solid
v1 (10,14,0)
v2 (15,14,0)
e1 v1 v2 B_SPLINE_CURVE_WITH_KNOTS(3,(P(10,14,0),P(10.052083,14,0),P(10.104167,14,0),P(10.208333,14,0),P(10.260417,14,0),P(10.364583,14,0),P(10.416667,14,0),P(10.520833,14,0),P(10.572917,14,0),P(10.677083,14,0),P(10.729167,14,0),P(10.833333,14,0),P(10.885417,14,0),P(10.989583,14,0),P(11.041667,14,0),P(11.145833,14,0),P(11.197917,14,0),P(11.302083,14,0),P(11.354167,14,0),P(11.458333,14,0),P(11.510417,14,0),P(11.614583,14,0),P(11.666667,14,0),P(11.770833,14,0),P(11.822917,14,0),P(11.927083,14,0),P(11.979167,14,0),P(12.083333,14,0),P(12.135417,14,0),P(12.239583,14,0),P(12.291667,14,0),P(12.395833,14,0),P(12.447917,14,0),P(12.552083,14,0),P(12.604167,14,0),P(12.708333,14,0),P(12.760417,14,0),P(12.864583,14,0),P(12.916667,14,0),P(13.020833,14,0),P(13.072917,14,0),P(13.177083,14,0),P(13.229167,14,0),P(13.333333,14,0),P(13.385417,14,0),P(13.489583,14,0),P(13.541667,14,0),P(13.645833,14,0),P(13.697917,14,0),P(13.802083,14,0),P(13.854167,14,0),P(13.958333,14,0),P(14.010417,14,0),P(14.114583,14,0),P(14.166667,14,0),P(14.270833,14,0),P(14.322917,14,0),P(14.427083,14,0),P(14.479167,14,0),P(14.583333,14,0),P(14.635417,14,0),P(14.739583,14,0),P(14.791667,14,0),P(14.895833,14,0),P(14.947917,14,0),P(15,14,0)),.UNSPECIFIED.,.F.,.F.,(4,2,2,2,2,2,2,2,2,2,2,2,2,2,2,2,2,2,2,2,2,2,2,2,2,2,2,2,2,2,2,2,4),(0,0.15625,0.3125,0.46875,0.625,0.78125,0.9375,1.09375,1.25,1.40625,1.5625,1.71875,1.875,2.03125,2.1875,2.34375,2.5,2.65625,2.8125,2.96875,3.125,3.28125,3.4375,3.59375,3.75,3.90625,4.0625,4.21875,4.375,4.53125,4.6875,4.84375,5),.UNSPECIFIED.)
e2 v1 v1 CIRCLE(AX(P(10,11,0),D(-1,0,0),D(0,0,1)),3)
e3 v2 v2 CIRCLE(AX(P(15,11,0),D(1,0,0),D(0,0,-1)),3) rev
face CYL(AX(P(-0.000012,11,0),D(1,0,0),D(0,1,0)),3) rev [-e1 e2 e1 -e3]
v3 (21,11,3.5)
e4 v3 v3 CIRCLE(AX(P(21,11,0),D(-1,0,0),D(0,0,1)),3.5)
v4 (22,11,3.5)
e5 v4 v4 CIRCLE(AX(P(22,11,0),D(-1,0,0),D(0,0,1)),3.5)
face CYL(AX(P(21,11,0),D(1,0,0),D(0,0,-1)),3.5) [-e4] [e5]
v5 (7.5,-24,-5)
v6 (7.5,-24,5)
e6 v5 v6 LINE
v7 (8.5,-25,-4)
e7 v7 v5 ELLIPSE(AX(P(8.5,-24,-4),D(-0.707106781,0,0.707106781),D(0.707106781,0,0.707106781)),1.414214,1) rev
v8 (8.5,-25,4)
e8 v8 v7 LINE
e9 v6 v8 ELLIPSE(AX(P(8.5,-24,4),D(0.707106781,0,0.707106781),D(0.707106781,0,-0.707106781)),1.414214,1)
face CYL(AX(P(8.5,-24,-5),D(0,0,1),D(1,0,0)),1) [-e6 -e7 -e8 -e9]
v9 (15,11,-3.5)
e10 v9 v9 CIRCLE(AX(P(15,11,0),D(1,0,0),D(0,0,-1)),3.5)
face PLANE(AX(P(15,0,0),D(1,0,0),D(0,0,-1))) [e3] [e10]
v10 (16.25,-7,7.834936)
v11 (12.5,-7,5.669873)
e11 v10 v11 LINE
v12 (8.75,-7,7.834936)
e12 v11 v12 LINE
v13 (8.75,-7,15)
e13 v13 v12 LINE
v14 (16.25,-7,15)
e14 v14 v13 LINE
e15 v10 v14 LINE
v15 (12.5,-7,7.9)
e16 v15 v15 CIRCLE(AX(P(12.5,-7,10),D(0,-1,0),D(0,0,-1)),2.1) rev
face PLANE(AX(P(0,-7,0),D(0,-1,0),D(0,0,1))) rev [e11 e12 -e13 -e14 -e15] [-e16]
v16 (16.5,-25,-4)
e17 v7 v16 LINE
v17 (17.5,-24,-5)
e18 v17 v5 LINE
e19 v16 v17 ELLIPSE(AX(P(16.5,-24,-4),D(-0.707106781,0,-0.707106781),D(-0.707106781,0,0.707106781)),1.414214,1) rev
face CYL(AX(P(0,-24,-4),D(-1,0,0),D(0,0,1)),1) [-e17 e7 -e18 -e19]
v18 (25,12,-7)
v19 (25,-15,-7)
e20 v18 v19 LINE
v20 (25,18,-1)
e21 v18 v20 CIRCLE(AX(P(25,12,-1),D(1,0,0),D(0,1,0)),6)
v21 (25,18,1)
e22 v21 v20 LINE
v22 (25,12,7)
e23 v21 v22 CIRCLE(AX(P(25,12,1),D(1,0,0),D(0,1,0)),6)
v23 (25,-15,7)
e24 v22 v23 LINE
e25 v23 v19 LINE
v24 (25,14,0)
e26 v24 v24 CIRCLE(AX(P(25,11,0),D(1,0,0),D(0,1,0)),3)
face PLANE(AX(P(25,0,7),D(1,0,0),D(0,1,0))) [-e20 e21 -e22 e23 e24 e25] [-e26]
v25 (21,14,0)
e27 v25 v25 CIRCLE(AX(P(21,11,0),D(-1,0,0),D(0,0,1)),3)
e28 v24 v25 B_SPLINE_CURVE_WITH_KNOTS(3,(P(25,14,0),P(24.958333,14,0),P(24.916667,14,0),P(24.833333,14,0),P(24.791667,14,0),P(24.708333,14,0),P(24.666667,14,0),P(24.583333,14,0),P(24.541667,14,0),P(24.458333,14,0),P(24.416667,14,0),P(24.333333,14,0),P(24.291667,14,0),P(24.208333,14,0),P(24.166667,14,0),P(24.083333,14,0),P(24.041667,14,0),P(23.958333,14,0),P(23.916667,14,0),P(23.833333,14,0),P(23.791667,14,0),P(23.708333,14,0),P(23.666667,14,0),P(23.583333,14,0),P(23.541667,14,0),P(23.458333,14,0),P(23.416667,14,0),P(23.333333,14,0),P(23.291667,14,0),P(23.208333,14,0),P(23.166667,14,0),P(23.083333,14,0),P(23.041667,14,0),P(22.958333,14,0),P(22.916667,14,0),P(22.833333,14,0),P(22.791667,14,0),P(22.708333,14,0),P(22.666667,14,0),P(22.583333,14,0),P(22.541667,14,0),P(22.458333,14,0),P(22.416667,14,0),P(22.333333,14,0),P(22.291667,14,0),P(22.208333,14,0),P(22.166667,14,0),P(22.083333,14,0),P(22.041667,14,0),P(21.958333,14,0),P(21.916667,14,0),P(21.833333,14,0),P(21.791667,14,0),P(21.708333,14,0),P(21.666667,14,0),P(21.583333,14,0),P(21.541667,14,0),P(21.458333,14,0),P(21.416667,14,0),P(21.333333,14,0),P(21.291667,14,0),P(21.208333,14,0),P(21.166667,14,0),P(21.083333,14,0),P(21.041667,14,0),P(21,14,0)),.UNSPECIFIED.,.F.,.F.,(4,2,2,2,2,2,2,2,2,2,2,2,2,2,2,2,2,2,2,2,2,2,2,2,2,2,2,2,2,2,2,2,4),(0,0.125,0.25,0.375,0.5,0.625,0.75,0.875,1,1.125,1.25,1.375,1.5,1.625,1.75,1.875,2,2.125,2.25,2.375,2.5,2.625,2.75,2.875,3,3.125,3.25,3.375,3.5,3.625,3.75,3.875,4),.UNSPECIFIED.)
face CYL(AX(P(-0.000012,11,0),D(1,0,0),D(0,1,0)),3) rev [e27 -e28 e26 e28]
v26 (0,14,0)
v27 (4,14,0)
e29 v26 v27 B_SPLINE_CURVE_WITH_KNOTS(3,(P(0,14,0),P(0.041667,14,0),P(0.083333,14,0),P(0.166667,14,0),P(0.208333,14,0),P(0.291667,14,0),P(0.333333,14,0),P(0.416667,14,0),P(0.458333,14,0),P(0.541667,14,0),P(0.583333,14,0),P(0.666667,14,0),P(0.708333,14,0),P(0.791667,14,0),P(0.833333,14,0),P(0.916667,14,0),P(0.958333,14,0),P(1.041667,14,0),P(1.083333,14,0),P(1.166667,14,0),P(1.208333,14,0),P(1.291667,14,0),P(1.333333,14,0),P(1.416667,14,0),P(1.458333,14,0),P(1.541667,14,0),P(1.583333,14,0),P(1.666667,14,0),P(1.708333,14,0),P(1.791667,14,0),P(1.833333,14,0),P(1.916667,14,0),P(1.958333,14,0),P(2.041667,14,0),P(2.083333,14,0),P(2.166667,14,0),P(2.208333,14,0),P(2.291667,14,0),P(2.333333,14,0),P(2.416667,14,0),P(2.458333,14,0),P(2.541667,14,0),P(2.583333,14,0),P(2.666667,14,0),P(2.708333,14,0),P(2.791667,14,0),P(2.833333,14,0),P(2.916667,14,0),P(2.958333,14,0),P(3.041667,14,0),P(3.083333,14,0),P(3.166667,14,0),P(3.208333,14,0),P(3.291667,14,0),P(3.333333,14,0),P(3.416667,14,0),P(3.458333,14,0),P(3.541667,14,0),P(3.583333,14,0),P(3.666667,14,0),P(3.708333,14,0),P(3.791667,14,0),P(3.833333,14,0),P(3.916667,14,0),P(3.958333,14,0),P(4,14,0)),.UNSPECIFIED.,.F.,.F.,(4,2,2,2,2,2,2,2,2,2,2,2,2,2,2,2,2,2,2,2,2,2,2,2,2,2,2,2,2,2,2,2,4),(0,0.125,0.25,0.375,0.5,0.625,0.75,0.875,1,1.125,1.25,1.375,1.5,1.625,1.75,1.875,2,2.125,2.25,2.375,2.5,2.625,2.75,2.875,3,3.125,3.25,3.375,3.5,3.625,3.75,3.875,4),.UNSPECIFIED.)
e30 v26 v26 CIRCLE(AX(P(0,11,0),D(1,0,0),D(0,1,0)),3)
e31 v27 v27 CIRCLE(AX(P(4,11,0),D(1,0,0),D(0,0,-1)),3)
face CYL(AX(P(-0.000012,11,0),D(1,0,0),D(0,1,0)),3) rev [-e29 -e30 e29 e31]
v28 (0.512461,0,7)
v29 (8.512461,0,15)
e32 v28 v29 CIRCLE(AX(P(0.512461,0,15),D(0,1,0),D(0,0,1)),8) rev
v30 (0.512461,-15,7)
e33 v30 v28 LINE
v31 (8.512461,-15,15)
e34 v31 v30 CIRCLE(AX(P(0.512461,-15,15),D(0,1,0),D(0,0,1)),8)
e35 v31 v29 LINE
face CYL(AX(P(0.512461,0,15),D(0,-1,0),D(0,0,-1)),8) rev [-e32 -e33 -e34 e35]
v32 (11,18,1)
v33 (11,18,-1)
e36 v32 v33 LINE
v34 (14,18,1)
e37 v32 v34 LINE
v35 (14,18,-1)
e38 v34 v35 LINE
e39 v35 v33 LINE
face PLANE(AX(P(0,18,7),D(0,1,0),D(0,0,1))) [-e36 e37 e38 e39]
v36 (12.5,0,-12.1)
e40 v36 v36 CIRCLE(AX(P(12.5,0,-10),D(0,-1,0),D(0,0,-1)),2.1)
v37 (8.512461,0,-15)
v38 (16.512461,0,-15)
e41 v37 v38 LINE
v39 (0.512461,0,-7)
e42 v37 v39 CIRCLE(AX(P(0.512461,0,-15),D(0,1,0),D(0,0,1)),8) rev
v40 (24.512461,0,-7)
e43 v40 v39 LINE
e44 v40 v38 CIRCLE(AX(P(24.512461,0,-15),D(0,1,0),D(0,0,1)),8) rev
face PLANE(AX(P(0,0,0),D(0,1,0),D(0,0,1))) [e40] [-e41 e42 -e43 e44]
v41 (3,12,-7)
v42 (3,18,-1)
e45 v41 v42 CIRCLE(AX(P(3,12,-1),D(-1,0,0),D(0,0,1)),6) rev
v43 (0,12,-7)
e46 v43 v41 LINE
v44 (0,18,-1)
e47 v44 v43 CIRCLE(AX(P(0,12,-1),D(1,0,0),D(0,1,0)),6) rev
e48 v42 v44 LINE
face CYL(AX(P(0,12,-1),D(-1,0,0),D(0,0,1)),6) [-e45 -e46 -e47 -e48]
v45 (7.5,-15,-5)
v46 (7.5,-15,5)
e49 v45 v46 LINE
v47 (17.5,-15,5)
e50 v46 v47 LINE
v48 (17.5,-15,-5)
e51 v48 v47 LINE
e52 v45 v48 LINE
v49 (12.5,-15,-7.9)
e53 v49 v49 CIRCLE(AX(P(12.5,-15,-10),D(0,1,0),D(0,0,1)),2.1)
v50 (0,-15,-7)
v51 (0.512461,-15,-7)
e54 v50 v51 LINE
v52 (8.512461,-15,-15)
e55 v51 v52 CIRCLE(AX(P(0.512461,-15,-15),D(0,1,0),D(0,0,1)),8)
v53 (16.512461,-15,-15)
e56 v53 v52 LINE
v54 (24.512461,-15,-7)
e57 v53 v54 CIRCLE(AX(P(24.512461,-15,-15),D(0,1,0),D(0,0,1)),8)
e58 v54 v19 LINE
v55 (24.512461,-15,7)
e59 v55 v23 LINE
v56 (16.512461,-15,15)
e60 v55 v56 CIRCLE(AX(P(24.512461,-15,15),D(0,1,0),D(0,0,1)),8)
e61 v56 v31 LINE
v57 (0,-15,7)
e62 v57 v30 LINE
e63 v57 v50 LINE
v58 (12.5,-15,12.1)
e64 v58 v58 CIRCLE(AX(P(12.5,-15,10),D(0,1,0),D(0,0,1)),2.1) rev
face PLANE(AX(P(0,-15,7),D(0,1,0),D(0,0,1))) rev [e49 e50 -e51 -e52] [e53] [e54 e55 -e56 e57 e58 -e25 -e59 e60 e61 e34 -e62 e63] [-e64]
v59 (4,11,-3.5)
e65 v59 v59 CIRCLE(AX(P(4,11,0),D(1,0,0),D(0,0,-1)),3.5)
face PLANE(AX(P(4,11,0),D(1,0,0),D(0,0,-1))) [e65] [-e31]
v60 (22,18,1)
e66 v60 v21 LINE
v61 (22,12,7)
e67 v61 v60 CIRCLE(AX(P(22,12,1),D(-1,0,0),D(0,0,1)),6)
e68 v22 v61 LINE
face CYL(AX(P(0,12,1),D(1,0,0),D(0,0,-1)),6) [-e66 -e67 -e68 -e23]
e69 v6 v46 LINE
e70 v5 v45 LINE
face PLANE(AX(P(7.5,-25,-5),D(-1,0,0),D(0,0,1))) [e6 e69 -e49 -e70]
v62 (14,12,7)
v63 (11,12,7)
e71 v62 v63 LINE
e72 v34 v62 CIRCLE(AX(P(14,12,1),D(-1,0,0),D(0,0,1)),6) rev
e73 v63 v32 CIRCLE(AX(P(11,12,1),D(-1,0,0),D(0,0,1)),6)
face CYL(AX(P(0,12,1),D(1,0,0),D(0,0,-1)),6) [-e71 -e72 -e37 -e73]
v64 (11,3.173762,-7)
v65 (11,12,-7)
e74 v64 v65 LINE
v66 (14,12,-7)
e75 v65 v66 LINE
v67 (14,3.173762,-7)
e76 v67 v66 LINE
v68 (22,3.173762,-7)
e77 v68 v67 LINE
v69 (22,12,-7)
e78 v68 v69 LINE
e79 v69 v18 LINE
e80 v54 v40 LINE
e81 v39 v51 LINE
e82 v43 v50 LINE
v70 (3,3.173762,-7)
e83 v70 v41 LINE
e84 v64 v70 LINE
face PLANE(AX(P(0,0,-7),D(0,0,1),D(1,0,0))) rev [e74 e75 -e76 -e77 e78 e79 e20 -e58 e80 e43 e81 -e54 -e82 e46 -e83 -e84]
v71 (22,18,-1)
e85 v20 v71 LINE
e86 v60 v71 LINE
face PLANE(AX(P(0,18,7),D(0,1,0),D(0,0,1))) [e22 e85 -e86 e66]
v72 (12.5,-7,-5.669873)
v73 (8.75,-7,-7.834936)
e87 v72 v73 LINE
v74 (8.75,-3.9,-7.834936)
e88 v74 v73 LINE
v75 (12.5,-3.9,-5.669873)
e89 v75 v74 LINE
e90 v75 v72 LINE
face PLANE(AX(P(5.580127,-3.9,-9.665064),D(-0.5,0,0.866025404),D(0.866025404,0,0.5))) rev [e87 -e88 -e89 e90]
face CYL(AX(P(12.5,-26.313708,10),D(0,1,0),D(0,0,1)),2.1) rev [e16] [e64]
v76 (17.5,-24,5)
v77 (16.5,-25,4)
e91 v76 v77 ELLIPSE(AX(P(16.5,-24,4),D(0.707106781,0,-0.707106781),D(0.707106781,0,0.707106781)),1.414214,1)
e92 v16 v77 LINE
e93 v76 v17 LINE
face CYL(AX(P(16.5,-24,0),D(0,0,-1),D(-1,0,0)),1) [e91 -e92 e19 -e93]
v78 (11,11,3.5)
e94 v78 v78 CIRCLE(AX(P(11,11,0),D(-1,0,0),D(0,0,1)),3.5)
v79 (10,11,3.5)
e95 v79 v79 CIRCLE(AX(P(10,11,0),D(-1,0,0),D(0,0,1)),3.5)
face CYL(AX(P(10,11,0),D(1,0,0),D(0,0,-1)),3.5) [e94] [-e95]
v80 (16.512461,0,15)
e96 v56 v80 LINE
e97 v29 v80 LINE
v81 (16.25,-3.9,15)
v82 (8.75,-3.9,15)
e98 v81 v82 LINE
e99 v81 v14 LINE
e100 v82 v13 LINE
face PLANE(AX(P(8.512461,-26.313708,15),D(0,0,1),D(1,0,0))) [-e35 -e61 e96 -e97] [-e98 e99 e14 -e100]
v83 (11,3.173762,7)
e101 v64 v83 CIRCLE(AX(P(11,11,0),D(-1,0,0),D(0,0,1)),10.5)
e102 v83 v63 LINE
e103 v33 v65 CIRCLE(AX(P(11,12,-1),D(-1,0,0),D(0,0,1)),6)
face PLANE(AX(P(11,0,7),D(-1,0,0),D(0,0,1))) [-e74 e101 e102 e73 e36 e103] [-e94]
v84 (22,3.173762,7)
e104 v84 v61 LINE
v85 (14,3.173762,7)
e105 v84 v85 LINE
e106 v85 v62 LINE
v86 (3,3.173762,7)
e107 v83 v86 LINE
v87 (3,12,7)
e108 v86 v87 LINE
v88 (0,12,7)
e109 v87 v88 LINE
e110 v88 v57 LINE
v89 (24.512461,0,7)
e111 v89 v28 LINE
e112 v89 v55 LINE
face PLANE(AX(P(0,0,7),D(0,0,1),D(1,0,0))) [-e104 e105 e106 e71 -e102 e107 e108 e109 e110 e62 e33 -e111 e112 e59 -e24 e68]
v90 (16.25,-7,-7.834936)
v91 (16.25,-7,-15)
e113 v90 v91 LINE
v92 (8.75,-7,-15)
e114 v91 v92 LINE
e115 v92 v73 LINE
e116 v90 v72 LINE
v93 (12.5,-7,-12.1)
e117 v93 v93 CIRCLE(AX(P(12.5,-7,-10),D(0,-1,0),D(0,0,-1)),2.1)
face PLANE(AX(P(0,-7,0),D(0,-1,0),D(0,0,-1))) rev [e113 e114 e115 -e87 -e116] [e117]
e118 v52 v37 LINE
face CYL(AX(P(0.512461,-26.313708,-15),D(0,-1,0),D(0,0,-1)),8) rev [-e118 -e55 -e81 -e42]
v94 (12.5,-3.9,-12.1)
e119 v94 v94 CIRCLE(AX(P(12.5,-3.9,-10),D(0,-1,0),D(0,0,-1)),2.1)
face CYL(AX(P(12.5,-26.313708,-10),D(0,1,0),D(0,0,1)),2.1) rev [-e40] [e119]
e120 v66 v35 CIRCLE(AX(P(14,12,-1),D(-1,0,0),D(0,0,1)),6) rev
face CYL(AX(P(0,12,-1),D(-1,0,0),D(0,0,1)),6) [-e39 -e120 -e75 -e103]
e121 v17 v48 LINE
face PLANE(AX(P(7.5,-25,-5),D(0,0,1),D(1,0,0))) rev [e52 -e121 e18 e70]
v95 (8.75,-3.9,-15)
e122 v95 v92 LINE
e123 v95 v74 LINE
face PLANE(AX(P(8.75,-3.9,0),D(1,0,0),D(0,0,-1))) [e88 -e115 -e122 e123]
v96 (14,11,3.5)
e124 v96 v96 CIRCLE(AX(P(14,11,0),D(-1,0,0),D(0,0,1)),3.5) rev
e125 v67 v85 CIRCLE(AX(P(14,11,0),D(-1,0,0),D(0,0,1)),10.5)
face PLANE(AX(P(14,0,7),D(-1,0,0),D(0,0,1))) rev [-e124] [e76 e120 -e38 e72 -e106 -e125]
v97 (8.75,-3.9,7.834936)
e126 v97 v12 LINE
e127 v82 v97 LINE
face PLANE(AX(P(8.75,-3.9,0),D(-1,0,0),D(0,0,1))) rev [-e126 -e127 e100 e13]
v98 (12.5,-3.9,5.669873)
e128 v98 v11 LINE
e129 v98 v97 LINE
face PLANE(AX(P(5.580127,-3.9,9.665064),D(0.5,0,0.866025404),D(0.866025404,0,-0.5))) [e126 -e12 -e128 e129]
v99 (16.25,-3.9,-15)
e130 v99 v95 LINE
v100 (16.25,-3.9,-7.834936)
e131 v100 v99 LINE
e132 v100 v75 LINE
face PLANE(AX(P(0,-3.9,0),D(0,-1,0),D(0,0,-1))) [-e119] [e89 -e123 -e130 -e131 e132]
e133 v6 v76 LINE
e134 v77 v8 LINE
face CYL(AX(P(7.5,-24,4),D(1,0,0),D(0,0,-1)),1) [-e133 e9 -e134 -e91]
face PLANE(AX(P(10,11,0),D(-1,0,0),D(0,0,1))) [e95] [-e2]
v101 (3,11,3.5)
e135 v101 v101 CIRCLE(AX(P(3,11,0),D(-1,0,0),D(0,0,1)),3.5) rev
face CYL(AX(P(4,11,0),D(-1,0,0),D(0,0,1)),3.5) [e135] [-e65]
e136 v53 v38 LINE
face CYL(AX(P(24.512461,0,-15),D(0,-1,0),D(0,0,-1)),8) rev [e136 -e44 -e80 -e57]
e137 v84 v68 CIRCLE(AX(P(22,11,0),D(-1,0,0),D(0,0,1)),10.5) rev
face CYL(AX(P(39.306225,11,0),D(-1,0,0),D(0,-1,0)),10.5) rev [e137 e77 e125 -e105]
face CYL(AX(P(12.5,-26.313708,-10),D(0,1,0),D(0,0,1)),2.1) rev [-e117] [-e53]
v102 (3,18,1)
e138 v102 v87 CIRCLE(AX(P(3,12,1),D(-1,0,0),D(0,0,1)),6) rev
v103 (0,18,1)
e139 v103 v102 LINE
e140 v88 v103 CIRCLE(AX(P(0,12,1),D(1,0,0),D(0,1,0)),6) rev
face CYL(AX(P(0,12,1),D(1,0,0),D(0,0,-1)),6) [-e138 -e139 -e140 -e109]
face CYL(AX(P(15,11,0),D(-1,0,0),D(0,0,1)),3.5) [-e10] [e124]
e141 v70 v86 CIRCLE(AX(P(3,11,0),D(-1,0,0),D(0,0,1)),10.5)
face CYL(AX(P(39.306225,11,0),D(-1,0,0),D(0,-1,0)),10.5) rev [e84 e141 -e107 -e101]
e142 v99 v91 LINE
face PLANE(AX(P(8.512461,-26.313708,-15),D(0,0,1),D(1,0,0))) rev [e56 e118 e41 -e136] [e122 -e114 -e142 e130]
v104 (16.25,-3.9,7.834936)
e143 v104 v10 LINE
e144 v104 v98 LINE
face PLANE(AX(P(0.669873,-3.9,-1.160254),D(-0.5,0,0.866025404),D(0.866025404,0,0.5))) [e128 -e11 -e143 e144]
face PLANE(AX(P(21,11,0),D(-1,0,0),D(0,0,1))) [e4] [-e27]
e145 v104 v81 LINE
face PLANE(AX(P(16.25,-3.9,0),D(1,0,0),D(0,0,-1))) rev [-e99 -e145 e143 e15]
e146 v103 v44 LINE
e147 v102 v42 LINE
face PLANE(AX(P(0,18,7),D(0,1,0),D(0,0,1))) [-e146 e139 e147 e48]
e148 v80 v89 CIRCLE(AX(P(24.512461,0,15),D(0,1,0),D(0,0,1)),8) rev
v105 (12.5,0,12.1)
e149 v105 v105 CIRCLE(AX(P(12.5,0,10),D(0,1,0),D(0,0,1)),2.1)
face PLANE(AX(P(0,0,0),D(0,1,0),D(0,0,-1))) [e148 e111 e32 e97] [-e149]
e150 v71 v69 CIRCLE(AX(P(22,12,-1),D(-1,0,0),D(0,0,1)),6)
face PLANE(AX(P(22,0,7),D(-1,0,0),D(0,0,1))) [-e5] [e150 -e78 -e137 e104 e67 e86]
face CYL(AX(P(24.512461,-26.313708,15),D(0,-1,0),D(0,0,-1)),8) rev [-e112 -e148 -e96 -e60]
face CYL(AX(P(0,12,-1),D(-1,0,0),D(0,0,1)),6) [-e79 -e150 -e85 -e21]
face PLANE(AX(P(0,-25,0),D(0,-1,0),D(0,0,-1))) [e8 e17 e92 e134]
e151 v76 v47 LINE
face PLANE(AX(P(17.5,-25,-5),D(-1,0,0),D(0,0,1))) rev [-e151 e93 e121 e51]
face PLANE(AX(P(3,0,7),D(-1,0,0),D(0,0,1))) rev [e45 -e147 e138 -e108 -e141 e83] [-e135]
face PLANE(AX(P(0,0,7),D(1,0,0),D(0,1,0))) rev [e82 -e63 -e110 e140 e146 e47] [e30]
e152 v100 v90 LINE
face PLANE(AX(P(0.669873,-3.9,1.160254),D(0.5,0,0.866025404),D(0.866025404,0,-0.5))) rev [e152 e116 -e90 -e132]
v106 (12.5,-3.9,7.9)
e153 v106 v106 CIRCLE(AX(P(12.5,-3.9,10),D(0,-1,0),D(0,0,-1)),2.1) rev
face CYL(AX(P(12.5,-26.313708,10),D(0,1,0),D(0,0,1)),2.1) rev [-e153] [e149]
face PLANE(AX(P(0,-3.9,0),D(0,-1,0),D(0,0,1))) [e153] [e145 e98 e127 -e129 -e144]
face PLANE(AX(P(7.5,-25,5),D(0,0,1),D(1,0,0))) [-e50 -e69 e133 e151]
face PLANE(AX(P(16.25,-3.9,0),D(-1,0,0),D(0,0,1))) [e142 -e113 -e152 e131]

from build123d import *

# Parameters (mm, degrees)
SKETCH_1_W               = 3
SKETCH_1_H               = 18
EXTRUDE_2_DEPTH          = 7
CUT_EXTRUDE_1_DEPTH      = 32.591137998
CUT_EXTRUDE_1_DEPTH_BACK = 7.591137998
CUT_EXTRUDE_1_START      = -25
SKETCH_3_R               = 3
SKETCH_15_R              = 3.5
SKETCH_15_R_2            = 3
EXTRUDE_11_DEPTH         = 1
EXTRUDE_START            = 1
SKETCH_5_R               = 3.5
SKETCH_5_R_2             = 3
EXTRUDE_6_DEPTH          = 1
SKETCH_6_R               = 3.5
SKETCH_6_R_2             = 3
EXTRUDE_7_DEPTH          = 1
SKETCH_7_R               = 3.5
SKETCH_7_R_2             = 3
EXTRUDE_8_DEPTH          = 1
FILLET_1_R               = 6
SKETCH_8_W               = 10
SKETCH_8_H               = 10
EXTRUDE_9_DEPTH          = 10
FILLET_2_R               = 1
EXTRUDE_START_2          = -22
EXTRUDE_14_DEPTH         = 19
SKETCH_17_W              = 8
SKETCH_17_H              = 8
SKETCH_17_R              = 2.1
EXTRUDE_12_DEPTH         = 8
EXTRUDE_START_3          = -7
SKETCH_17_2_W            = 8
SKETCH_17_2_H            = 8
SKETCH_17_2_R            = 2.1
EXTRUDE_13_DEPTH         = 7
CUT_EXTRUDE_2_DEPTH      = 3.1
FILLET_4_R               = 8


with BuildPart() as part:
    # 草图1 → 凸台-拉伸2 (new, symmetric)
    with BuildSketch(Plane.XY):
        Polygon((3, 0), (0, 0), (0, -15), (25, -15), (25, 0), (22, 0), (14, 0), (11, 0), align=None)
        with Locations((12.5, 9)):
            Rectangle(SKETCH_1_W, SKETCH_1_H)
        with Locations((23.5, 9)):
            Rectangle(SKETCH_1_W, SKETCH_1_H)
        with Locations((1.5, 9)):
            Rectangle(SKETCH_1_W, SKETCH_1_H)
    extrude(amount=EXTRUDE_2_DEPTH, both=True)

    # 草图3 → 切除-拉伸1 (cut, two sides: drawn at the far end of the back side and taken through both)
    with BuildSketch(Plane(origin=(25, 0, 0), x_dir=(0, 0, -1), z_dir=(1, 0, 0)).offset(CUT_EXTRUDE_1_START - CUT_EXTRUDE_1_DEPTH_BACK)):
        with Locations(Location((0, 11, 0), (0, 0, 90))):
            Circle(SKETCH_3_R)
    extrude(amount=CUT_EXTRUDE_1_DEPTH + CUT_EXTRUDE_1_DEPTH_BACK, mode=Mode.SUBTRACT)

    # 草图15 → 凸台-拉伸11 (add)
    with BuildSketch(Plane(origin=(3, 0, 0), x_dir=(0, 0, -1), z_dir=(1, 0, 0))):
        with Locations(Location((0, 11, 0), (0, 0, 180))):
            Circle(SKETCH_15_R)
        with Locations(Location((0, 11, 0), (0, 0, 90))):
            Circle(SKETCH_15_R_2, mode=Mode.SUBTRACT)
    extrude(amount=EXTRUDE_11_DEPTH)

    # 草图5 → 凸台-拉伸6 (add)
    with BuildSketch(Plane.ZY.offset(-11).offset(EXTRUDE_START)):
        with Locations((0, 11)):
            Circle(SKETCH_5_R)
        with Locations(Location((0, 11, 0), (0, 0, 90))):
            Circle(SKETCH_5_R_2, mode=Mode.SUBTRACT)
    extrude(amount=-EXTRUDE_6_DEPTH)

    # 草图6 → 凸台-拉伸7 (add)
    with BuildSketch(Plane(origin=(14, 0, 0), x_dir=(0, 0, -1), z_dir=(1, 0, 0))):
        with Locations(Location((0, 11, 0), (0, 0, 180))):
            Circle(SKETCH_6_R)
        with Locations(Location((0, 11, 0), (0, 0, 90))):
            Circle(SKETCH_6_R_2, mode=Mode.SUBTRACT)
    extrude(amount=EXTRUDE_7_DEPTH)

    # 草图7 → 凸台-拉伸8 (add)
    with BuildSketch(Plane.ZY.offset(-22).offset(EXTRUDE_START)):
        with Locations((0, 11)):
            Circle(SKETCH_7_R)
        with Locations(Location((0, 11, 0), (0, 0, 90))):
            Circle(SKETCH_7_R_2, mode=Mode.SUBTRACT)
    extrude(amount=-EXTRUDE_8_DEPTH)

    # 圆角1
    fillet_1_edges = [part.edges().sort_by_distance(p)[0] for p in [
        (23.5, 18, 7),
        (1.5, 18, -7),
        (12.5, 18, -7),
        (23.5, 18, -7),
        (12.5, 18, 7),
        (1.5, 18, 7),
    ]]
    fillet(fillet_1_edges, radius=FILLET_1_R)

    # 草图8 → 凸台-拉伸9 (add)
    with BuildSketch(Plane.XZ.offset(15)):
        with Locations((12.5, 0)):
            Rectangle(SKETCH_8_W, SKETCH_8_H)
    extrude(amount=EXTRUDE_9_DEPTH)

    # 圆角2
    fillet_2_edges = [part.edges().sort_by_distance(p)[0] for p in [
        (12.5, -25, 5),
        (7.5, -25, 0),
        (12.5, -25, -5),
        (17.5, -25, 0),
    ]]
    fillet(fillet_2_edges, radius=FILLET_2_R)

    # 草图23 → 凸台-拉伸14 (add)
    with BuildSketch(Plane.ZY.offset(EXTRUDE_START_2)):
        with BuildLine():
            Line((-7, -7), (7, -7))
            Line((7, -7), (7, 3.173762079))
            ThreePointArc((7, 3.173762079), (0, 0.5), (-7, 3.173762079))
            Line((-7, 3.173762079), (-7, -7))
        make_face()
    extrude(amount=EXTRUDE_14_DEPTH)

    # 草图17 → 凸台-拉伸12 (add)
    with BuildSketch(Plane(origin=(0, -7, 0), x_dir=(-1, 0, 0), z_dir=(0, -1, 0))):
        with Locations((-12.51246086, 11)):
            Rectangle(SKETCH_17_W, SKETCH_17_H)
        with Locations(Location((-12.5, 10, 0), (0, 0, 270))):
            Circle(SKETCH_17_R, mode=Mode.SUBTRACT)
    extrude_12 = extrude(amount=EXTRUDE_12_DEPTH)

    # 草图17<2> → 凸台-拉伸13 (add)
    with BuildSketch(Plane(origin=(0, -7, 0), x_dir=(-1, 0, 0), z_dir=(0, -1, 0)).offset(EXTRUDE_START_3)):
        with Locations((-12.51246086, 11)):
            Rectangle(SKETCH_17_2_W, SKETCH_17_2_H)
        with Locations(Location((-12.5, 10, 0), (0, 0, 270))):
            Circle(SKETCH_17_2_R, mode=Mode.SUBTRACT)
    extrude_13 = extrude(amount=EXTRUDE_13_DEPTH)

    # 草图18 → 切除-拉伸2 (cut)
    with BuildSketch(Plane(origin=(0, -7, 0), x_dir=(-1, 0, 0), z_dir=(0, -1, 0))):
        Polygon((-8.75, 15), (-8.75, 12.165063509), (-12.5, 14.330127019), (-16.25, 12.165063509), (-16.25, 15), align=None)
        Polygon((-8.75, 7.834936491), (-8.75, 12.165063509), (-12.5, 14.330127019), (-16.25, 12.165063509), (-16.25, 7.834936491), (-12.5, 5.669872981), align=None)
    cut_extrude_2 = extrude(amount=-CUT_EXTRUDE_2_DEPTH, mode=Mode.SUBTRACT)

    # 镜向1: 凸台-拉伸12, 凸台-拉伸13, 切除-拉伸2 across plane
    add(extrude_12.mirror(Plane.XY))
    add(extrude_13.mirror(Plane.XY))
    add(cut_extrude_2.mirror(Plane.XY), mode=Mode.SUBTRACT)

    # 圆角4
    fillet_4_edges = [part.edges().sort_by_distance(p)[0] for p in [
        (8.51246086, -7.5, -7),
        (16.51246086, -7.5, -7),
        (16.51246086, -7.5, 7),
        (8.51246086, -7.5, 7),
    ]]
    fillet(fillet_4_edges, radius=FILLET_4_R - 0.0001)  # a hair under: the kernel refuses the full size


solid = part.part
